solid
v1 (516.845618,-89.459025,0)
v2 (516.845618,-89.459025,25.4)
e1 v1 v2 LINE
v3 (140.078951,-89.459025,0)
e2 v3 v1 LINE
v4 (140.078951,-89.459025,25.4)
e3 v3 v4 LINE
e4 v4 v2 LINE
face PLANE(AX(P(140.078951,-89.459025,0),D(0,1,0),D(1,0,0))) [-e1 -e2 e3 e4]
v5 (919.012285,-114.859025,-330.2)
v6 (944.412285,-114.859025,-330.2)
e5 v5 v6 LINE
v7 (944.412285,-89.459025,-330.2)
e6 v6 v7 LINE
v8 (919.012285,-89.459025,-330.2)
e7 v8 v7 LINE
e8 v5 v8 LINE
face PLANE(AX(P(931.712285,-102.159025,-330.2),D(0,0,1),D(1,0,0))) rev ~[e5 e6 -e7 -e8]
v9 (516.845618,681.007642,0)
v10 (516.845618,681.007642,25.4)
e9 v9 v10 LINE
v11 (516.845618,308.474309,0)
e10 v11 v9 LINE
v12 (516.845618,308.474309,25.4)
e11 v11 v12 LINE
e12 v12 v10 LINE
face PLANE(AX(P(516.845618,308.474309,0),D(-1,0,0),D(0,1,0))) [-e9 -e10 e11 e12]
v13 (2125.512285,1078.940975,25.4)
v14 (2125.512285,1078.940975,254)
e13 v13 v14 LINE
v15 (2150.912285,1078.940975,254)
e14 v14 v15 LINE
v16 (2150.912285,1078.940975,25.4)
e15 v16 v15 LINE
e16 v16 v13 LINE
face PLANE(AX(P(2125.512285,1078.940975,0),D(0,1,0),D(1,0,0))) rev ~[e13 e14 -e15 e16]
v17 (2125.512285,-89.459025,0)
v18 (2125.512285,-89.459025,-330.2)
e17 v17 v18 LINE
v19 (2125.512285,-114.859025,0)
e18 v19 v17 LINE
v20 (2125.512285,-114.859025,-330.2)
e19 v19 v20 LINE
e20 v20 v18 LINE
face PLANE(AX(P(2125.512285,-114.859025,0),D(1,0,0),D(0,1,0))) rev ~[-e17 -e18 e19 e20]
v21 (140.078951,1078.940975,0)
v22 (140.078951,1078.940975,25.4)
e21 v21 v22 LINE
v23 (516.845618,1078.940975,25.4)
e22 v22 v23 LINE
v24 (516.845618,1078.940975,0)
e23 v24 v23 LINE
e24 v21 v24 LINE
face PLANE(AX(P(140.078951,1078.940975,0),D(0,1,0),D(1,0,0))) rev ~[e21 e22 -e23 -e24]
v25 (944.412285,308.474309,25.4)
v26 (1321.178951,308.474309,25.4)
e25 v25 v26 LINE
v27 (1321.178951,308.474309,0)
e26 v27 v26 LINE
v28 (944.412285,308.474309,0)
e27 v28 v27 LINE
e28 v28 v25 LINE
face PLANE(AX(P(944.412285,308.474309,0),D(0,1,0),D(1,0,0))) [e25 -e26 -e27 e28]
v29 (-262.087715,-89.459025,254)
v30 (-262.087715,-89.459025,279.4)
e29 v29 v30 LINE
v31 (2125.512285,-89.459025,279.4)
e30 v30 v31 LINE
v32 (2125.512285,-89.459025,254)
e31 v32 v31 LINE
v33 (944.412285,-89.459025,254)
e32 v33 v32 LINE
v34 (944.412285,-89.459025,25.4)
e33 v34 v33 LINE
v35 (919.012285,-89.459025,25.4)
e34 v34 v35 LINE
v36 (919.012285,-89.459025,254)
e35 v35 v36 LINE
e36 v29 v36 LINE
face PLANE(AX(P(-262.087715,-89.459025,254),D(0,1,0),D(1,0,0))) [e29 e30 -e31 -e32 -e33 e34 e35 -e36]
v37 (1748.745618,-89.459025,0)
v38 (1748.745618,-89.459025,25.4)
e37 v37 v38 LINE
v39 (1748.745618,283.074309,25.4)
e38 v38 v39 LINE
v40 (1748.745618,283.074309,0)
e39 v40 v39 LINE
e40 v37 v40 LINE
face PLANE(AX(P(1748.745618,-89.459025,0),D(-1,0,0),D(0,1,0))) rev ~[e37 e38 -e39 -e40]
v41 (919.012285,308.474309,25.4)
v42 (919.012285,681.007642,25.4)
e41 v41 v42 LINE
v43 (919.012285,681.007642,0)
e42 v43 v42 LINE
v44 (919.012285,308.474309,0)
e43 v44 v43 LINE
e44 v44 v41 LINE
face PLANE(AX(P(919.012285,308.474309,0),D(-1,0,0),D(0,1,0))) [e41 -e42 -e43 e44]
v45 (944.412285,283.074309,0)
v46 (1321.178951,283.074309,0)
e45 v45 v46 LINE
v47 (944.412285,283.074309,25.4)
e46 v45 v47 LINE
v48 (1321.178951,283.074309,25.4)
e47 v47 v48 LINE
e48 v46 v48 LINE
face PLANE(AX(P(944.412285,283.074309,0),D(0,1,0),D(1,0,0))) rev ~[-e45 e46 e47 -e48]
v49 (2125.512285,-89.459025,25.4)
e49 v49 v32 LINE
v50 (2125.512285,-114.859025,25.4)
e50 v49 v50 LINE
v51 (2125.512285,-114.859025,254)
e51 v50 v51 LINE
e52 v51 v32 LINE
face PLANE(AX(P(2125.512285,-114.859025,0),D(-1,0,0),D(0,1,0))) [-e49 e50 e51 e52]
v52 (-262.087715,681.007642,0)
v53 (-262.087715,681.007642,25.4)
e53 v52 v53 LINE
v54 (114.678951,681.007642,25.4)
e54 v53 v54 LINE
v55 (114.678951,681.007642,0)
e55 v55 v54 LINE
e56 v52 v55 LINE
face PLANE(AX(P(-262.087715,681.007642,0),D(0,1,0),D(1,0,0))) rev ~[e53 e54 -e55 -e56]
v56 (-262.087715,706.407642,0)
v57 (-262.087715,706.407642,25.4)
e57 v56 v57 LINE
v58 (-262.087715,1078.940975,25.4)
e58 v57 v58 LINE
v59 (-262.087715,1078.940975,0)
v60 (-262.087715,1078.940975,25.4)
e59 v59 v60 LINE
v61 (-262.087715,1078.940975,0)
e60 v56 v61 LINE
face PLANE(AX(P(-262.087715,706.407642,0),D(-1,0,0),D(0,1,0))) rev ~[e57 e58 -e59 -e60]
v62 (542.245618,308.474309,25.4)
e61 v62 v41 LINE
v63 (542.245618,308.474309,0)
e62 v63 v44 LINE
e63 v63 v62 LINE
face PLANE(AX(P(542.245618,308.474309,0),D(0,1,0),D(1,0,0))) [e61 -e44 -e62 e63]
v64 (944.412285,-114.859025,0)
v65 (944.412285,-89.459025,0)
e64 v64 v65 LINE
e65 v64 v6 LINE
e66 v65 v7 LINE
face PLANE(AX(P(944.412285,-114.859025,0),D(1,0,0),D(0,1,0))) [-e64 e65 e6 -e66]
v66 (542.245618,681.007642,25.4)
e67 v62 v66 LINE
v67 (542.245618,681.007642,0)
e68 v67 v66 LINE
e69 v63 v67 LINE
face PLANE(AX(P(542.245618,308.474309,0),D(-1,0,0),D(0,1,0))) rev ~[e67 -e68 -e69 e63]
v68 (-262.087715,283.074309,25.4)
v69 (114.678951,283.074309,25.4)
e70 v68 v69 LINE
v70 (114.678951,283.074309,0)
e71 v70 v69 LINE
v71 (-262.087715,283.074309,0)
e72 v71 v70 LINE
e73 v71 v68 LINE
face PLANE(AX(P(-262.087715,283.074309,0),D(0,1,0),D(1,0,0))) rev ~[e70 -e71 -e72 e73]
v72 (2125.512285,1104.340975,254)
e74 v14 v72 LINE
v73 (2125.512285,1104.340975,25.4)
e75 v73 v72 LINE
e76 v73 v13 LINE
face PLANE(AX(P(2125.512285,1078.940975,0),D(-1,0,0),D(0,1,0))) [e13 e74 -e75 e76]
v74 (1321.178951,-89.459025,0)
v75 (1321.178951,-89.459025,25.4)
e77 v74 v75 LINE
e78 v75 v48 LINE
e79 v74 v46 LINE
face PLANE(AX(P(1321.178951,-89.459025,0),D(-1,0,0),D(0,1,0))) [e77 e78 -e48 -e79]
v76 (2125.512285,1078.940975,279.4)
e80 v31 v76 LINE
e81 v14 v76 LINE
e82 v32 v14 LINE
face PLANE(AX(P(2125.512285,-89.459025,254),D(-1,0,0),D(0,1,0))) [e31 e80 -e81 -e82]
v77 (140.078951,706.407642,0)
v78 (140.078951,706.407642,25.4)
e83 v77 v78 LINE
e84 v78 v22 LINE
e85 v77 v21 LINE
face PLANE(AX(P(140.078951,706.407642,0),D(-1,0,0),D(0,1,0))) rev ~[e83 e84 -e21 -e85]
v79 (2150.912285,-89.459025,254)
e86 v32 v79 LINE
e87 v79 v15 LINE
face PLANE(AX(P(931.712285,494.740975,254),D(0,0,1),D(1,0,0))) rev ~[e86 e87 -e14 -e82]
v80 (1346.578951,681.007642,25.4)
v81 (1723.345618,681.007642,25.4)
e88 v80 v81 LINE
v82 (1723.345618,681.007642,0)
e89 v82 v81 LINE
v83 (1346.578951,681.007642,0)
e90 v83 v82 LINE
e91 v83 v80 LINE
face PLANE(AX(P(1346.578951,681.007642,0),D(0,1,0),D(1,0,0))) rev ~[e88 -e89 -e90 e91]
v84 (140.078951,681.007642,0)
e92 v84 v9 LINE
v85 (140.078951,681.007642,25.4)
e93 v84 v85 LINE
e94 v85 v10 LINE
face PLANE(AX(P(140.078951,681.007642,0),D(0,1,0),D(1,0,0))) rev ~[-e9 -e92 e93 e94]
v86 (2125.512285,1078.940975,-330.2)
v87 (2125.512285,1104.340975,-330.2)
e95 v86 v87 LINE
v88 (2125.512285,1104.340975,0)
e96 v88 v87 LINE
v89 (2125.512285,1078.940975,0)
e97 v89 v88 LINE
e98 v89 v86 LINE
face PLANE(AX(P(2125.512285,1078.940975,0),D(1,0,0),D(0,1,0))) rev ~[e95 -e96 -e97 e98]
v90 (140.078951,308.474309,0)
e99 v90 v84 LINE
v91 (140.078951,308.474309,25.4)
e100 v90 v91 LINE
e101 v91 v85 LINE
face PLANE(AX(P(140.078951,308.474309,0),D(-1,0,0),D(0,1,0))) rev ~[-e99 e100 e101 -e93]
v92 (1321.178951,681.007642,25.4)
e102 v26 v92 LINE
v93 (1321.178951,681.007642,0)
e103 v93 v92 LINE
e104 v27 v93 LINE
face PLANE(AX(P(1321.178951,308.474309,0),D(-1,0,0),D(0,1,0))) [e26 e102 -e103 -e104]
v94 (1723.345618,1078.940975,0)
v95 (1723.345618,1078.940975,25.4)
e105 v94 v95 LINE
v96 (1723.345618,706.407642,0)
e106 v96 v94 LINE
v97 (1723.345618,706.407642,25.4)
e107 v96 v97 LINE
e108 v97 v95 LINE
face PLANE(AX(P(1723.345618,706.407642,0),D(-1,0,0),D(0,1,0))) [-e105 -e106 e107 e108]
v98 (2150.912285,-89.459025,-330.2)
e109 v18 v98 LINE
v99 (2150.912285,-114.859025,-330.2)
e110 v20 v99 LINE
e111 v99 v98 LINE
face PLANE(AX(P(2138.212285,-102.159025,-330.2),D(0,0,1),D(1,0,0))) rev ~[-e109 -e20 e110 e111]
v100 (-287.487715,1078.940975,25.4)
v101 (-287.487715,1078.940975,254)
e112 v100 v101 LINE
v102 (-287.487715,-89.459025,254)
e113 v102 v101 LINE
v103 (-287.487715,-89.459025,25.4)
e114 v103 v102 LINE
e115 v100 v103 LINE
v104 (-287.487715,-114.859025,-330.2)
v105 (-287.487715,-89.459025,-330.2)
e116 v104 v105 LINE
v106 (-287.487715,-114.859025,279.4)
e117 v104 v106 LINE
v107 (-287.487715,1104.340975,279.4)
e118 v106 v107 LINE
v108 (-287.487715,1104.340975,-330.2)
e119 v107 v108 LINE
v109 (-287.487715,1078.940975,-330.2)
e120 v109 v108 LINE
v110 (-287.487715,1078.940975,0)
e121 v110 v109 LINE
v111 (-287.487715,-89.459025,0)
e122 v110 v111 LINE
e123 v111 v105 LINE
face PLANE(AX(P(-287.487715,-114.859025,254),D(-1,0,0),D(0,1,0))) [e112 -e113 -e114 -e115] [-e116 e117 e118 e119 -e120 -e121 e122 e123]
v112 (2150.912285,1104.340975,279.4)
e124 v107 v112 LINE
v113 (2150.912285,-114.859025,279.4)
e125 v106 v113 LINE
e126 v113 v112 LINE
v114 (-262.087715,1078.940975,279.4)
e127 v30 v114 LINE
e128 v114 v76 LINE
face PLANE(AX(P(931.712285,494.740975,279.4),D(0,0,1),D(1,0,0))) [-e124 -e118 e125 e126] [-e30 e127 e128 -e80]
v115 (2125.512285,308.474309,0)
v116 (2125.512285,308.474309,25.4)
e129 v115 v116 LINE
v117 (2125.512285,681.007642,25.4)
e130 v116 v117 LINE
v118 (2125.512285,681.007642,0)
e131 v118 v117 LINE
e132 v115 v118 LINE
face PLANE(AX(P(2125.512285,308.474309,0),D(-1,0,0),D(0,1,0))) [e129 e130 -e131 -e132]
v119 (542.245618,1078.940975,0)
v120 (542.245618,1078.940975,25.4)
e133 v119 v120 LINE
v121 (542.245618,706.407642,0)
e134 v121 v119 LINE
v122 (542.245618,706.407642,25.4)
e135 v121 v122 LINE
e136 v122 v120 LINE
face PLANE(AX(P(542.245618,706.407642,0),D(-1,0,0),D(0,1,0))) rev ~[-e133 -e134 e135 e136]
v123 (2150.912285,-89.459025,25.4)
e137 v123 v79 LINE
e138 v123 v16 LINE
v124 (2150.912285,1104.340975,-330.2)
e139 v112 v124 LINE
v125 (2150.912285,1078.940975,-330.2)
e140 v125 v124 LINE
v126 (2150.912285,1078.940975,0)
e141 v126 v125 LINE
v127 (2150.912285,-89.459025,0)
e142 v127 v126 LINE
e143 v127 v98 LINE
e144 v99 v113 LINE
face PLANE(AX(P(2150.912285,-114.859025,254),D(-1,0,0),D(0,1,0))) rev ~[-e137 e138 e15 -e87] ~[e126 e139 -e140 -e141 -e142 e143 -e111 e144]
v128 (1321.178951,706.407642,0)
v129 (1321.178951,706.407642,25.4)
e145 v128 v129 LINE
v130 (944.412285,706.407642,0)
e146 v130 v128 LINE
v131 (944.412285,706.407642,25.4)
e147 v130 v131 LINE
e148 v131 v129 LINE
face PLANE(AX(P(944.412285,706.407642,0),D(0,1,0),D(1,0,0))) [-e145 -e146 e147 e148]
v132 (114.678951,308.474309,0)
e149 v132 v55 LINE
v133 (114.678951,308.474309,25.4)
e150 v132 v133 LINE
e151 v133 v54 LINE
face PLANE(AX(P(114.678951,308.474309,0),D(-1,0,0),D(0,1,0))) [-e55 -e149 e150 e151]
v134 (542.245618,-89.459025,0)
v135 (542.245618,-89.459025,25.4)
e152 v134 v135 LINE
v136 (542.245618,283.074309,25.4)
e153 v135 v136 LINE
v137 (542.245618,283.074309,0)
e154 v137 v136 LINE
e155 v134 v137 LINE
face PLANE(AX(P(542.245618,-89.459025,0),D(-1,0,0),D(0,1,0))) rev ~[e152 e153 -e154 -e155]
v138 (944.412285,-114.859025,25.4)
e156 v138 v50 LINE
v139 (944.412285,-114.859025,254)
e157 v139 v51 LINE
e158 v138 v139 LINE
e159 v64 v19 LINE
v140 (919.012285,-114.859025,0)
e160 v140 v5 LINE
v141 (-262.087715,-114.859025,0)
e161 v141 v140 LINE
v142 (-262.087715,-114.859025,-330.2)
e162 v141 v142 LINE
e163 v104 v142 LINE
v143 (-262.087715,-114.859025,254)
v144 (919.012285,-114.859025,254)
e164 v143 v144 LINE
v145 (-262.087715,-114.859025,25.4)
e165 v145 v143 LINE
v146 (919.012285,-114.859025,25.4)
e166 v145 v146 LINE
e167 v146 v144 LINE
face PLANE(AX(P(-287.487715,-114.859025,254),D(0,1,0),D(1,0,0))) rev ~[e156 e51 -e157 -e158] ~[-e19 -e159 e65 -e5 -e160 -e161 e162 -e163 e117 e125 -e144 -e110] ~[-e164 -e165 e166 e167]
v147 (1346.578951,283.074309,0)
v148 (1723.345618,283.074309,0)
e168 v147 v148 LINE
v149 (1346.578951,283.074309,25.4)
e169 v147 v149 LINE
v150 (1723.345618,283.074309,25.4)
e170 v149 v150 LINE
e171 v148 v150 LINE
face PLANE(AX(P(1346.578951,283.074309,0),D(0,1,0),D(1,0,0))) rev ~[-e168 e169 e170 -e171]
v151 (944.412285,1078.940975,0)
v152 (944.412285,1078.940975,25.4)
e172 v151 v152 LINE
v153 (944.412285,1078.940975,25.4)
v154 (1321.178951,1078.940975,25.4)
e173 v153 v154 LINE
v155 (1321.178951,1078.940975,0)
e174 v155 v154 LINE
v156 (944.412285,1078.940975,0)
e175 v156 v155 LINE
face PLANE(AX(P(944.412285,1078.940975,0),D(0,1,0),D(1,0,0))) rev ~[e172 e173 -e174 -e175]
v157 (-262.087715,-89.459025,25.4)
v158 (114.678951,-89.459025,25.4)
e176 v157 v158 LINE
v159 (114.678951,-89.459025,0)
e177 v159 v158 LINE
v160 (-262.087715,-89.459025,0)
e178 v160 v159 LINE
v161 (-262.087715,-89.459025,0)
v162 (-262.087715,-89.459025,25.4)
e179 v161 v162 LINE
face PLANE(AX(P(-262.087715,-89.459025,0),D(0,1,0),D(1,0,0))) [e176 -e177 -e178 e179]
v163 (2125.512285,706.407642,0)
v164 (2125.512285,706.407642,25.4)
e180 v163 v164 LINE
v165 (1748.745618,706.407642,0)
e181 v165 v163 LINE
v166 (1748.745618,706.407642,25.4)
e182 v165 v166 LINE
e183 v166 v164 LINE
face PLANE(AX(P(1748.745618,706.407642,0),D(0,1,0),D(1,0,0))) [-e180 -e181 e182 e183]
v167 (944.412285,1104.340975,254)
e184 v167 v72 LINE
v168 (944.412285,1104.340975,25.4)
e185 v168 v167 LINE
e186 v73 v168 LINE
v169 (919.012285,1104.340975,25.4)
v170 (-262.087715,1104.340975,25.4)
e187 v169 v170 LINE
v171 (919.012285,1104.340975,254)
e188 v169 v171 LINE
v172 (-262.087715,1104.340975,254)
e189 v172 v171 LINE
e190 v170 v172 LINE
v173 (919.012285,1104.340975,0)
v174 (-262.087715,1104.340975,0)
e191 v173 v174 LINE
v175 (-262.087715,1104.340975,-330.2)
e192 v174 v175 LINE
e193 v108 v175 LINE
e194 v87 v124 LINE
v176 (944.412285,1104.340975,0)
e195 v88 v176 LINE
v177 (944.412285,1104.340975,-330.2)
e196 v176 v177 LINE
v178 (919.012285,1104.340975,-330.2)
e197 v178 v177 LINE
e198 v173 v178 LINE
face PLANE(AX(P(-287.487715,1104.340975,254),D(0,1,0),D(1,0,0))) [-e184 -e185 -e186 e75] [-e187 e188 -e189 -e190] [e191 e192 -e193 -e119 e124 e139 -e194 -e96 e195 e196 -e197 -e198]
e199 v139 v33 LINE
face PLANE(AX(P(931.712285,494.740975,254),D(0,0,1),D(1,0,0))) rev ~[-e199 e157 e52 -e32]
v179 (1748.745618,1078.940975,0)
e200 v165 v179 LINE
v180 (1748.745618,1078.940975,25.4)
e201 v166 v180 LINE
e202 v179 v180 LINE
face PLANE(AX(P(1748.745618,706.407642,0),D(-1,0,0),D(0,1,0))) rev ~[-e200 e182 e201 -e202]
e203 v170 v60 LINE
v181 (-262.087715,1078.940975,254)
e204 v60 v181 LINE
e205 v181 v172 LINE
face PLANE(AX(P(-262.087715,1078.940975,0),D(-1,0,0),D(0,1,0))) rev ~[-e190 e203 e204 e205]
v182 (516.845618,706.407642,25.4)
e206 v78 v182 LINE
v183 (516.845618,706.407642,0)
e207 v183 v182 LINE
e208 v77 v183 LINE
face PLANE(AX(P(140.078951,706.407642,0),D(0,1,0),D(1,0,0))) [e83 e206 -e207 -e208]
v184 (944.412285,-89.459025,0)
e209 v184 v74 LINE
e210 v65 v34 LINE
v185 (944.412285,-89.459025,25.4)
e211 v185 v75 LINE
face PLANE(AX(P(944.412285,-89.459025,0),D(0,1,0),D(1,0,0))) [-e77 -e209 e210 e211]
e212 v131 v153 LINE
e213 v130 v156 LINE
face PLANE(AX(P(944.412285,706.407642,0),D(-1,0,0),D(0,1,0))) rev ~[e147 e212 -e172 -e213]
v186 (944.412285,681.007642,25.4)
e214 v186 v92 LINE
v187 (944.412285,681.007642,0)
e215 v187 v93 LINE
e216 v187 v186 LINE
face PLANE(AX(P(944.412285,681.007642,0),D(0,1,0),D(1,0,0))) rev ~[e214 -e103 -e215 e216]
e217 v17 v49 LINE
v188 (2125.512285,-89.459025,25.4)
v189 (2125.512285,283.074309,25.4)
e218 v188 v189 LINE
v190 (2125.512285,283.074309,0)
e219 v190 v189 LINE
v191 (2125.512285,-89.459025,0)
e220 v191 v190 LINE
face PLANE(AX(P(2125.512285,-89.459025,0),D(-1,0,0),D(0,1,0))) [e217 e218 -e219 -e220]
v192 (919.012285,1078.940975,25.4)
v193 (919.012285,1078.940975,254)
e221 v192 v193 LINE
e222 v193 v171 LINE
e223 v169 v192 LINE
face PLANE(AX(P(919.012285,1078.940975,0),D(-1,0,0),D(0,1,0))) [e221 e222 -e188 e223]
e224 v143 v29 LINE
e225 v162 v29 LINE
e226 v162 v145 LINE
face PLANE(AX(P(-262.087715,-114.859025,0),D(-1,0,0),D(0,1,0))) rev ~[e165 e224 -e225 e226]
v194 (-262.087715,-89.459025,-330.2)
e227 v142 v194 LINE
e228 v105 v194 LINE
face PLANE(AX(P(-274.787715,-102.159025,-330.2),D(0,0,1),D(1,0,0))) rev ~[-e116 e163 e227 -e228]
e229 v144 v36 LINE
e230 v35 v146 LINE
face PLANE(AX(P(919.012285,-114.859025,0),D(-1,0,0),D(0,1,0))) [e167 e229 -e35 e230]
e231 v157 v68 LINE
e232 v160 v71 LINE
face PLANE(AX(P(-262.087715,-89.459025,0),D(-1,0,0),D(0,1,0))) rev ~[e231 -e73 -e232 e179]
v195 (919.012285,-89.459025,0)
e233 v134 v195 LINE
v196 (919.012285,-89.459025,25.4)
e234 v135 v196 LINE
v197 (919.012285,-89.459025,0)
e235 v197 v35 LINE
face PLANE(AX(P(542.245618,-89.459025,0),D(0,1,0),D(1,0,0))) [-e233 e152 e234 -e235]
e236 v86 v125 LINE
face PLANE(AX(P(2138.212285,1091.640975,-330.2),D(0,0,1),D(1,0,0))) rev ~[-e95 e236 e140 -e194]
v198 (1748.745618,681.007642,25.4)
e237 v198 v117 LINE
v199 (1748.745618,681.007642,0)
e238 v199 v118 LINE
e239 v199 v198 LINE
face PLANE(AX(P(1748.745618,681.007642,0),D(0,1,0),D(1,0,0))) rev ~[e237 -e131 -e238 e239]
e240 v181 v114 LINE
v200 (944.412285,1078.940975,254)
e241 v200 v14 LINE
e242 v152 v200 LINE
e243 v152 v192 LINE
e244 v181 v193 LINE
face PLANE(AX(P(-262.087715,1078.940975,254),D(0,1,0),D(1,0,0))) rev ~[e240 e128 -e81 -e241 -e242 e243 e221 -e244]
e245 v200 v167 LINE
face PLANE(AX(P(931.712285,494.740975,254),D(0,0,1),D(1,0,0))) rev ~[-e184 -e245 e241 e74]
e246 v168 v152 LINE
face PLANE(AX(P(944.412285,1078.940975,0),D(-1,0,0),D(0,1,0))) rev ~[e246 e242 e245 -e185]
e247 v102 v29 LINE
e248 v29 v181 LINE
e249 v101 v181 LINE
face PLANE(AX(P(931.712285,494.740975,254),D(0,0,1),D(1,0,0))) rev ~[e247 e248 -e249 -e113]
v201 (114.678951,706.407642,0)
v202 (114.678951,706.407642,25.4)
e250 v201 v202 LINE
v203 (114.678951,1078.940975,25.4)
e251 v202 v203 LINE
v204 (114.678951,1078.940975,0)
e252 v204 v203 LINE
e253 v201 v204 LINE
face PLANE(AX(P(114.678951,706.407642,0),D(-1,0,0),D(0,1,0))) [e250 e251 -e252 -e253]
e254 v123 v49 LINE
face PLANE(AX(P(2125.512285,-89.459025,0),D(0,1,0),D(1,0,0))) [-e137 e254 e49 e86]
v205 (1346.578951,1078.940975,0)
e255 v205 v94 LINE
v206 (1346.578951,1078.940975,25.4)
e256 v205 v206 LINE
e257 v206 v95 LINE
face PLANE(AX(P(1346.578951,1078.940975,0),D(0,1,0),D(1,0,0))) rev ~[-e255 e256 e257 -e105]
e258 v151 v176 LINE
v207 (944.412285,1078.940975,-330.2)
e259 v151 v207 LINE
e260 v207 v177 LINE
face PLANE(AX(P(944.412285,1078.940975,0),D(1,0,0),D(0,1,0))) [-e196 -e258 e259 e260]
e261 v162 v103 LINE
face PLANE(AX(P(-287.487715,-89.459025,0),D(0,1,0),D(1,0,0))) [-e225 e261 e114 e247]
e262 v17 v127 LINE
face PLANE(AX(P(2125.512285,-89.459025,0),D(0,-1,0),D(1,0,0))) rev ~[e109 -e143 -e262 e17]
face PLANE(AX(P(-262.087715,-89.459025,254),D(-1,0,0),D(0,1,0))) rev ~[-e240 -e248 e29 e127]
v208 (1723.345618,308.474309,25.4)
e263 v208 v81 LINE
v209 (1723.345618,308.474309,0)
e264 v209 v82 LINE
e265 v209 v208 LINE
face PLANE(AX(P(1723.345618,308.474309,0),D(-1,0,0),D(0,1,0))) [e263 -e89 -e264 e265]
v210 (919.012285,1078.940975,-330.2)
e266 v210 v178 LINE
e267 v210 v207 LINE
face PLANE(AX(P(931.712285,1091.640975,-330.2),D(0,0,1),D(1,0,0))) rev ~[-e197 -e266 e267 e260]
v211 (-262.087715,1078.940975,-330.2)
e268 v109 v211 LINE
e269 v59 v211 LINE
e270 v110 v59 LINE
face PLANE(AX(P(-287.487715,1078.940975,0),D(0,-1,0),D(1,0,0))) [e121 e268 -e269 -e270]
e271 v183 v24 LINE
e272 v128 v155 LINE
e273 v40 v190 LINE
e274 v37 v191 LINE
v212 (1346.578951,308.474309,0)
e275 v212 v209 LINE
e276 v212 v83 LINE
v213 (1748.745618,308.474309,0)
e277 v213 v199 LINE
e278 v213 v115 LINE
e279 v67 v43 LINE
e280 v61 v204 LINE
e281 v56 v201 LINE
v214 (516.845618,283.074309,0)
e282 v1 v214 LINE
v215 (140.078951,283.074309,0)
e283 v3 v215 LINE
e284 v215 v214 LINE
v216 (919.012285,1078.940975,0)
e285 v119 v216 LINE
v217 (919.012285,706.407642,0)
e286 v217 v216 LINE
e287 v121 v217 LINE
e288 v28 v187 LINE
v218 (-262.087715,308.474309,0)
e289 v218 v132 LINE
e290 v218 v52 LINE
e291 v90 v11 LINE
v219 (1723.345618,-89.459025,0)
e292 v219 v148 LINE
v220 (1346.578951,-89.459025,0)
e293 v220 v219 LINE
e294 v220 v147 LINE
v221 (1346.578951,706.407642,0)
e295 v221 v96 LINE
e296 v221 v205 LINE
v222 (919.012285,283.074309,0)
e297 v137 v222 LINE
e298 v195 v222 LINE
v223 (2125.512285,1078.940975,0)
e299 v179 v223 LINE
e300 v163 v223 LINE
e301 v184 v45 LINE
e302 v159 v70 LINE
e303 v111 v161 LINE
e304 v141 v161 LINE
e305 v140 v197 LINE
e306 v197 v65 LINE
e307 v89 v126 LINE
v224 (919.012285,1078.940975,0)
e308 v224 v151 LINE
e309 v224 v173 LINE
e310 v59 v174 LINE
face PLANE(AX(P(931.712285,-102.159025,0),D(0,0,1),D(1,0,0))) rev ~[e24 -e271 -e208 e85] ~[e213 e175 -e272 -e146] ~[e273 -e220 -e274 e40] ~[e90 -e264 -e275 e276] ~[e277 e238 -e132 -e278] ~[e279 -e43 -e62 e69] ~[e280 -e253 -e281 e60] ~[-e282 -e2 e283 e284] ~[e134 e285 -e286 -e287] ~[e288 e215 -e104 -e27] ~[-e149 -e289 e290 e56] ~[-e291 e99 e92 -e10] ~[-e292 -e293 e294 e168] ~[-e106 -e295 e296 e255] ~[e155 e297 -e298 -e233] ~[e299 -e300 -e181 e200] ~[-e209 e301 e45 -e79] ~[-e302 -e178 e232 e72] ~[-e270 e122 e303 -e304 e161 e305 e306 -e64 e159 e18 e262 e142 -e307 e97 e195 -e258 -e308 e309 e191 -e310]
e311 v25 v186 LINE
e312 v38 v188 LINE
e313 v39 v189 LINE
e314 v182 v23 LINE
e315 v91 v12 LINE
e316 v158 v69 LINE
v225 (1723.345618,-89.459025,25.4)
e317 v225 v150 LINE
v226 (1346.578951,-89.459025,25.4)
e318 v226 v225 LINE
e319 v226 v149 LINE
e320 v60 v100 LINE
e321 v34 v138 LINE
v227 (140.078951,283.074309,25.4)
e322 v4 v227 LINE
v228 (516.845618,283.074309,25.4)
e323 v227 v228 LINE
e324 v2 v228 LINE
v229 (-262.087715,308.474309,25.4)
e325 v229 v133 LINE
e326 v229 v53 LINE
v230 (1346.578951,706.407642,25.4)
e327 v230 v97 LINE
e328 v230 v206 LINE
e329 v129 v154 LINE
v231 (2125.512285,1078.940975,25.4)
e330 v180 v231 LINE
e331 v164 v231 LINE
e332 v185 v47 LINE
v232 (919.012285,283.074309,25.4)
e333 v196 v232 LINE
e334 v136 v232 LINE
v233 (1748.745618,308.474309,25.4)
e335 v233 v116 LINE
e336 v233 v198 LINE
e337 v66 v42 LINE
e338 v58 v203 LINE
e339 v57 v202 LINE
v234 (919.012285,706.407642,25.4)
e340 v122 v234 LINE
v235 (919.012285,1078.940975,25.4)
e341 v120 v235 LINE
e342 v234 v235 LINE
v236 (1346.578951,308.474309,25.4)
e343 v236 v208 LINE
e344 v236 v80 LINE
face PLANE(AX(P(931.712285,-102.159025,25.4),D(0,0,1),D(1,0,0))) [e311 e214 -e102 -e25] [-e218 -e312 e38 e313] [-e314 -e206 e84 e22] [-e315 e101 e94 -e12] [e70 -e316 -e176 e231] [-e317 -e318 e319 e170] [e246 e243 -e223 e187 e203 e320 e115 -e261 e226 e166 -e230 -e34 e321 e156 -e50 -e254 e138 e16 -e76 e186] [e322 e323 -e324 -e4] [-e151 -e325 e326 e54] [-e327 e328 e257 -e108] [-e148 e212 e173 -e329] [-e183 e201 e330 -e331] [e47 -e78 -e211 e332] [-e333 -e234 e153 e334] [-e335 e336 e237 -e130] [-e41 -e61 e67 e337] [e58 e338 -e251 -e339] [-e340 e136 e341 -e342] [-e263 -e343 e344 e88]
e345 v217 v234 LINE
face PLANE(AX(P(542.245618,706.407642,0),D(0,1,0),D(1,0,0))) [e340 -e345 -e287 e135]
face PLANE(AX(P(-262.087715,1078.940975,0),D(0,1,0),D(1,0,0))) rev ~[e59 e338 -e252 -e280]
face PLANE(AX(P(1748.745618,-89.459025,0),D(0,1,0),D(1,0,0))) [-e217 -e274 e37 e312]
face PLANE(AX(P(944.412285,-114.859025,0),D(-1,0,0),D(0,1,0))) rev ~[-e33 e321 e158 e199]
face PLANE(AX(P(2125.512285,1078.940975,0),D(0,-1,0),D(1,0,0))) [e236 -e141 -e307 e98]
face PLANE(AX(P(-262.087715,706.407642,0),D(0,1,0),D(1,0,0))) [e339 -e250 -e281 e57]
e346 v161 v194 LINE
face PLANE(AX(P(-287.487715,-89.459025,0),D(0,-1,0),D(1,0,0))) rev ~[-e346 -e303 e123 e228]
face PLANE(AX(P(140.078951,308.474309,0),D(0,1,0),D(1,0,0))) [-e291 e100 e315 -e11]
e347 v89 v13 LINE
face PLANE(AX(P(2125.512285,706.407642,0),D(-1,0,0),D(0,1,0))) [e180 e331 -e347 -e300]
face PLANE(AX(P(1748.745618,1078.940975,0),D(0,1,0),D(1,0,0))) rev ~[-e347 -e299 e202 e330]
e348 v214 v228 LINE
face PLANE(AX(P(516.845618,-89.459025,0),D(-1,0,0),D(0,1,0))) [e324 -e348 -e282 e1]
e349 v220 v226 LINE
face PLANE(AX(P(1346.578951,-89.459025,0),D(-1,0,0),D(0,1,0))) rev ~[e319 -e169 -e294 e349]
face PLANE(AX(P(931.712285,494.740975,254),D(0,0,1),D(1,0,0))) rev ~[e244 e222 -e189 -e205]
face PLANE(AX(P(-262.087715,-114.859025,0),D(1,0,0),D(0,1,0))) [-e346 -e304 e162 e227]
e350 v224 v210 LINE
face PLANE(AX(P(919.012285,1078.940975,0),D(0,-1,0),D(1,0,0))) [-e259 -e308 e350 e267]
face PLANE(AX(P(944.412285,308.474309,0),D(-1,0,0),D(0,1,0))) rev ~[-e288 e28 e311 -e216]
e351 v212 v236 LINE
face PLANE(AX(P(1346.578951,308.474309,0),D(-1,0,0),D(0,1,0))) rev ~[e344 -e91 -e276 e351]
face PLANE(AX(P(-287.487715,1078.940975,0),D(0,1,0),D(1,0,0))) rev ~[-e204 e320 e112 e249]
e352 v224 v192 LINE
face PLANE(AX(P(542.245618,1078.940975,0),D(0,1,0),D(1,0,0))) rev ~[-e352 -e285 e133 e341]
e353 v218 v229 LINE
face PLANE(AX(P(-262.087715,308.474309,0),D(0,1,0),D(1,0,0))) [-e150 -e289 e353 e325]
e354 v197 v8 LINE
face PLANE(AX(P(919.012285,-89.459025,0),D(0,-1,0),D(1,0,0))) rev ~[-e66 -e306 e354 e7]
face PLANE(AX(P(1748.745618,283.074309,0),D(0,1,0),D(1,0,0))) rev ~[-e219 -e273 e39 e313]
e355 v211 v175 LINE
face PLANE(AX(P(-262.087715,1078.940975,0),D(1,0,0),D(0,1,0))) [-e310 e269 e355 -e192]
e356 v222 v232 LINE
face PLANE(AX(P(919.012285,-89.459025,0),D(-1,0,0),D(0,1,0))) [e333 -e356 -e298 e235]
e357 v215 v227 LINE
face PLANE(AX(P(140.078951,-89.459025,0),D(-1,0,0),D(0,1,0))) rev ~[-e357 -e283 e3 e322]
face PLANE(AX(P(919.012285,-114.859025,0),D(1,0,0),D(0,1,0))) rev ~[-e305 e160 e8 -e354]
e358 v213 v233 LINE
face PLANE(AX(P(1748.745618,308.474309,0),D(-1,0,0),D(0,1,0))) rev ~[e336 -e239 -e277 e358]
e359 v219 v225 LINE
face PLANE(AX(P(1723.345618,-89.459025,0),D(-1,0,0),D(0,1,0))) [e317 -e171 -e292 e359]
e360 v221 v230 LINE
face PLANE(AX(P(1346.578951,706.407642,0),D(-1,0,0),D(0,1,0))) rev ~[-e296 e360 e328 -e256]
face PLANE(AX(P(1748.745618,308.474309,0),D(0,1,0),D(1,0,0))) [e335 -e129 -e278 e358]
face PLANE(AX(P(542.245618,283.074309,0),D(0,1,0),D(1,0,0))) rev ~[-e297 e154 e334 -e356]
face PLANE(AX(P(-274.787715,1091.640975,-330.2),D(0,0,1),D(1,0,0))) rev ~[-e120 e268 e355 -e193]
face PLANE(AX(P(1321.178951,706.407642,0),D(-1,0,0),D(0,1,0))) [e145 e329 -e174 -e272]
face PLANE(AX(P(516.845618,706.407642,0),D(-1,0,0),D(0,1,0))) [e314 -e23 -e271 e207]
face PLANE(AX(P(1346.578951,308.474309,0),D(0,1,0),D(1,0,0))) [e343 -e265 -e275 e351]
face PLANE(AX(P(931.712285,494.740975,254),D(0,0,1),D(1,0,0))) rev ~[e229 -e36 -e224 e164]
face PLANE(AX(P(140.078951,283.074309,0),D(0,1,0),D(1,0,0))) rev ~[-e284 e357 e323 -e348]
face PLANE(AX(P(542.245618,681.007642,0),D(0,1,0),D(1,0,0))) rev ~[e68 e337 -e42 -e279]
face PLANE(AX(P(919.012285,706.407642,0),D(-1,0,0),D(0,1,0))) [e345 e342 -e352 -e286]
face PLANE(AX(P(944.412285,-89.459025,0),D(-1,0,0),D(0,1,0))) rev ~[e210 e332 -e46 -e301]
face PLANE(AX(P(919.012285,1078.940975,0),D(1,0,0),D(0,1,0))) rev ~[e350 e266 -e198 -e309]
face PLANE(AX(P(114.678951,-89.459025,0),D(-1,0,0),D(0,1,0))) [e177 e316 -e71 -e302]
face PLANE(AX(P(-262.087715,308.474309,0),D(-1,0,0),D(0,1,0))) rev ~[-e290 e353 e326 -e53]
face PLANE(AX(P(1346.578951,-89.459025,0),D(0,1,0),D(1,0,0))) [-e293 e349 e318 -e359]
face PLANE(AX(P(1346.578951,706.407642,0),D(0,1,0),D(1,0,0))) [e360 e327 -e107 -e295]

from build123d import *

# Parameters (mm, degrees)
F0_W     = 25.4
F0_H     = 25.4
F0_W_2   = 376.7666666667
F0_H_2   = 372.5333333333
F1_DEPTH = 25.4
F2_DEPTH = 330.2
F3_DEPTH = 254
F4_W     = 2438.4
F4_H     = 1219.2
F4_W_2   = 2387.6
F4_H_2   = 1168.4
F5_DEPTH = 25.4


with BuildPart() as f1:
    # F0 (on Top) → F1 (new body)
    with BuildSketch(Plane.XY):
        with Locations((931.7122847671, -102.1590246889)):
            Rectangle(F0_W, F0_H)
        Polygon((919.0122847671, 1104.3409753111), (-262.0877152329, 1104.3409753111), (-262.0877152329, 1078.9409753111), (-287.4877152329, 1078.9409753111), (-287.4877152329, -89.4590246889), (-262.0877152329, -89.4590246889), (-262.0877152329, -114.8590246889), (919.0122847671, -114.8590246889), (919.0122847671, -89.4590246889), (944.4122847671, -89.4590246889), (944.4122847671, -114.8590246889), (2125.5122847671, -114.8590246889), (2125.5122847671, -89.4590246889), (2150.9122847671, -89.4590246889), (2150.9122847671, 1078.9409753111), (2125.5122847671, 1078.9409753111), (2125.5122847671, 1104.3409753111), (944.4122847671, 1104.3409753111), (944.4122847671, 1078.9409753111), (919.0122847671, 1078.9409753111), align=None)
        with Locations((-73.7043818996, 96.8076419778)):
            Rectangle(F0_W_2, F0_H_2, mode=Mode.SUBTRACT)
        with Locations((328.4622847671, 96.8076419778)):
            Rectangle(F0_W_2, F0_H_2, mode=Mode.SUBTRACT)
        with Locations((730.6289514337, 96.8076419778)):
            Rectangle(F0_W_2, F0_H_2, mode=Mode.SUBTRACT)
        with Locations((-73.7043818996, 494.7409753111)):
            Rectangle(F0_W_2, F0_H_2, mode=Mode.SUBTRACT)
        with Locations((1132.7956181004, 96.8076419778)):
            Rectangle(F0_W_2, F0_H_2, mode=Mode.SUBTRACT)
        with Locations((1534.9622847671, 96.8076419778)):
            Rectangle(F0_W_2, F0_H_2, mode=Mode.SUBTRACT)
        with Locations((1937.1289514337, 96.8076419778)):
            Rectangle(F0_W_2, F0_H_2, mode=Mode.SUBTRACT)
        with Locations((1534.9622847671, 494.7409753111)):
            Rectangle(F0_W_2, F0_H_2, mode=Mode.SUBTRACT)
        with Locations((1937.1289514337, 494.7409753111)):
            Rectangle(F0_W_2, F0_H_2, mode=Mode.SUBTRACT)
        with Locations((328.4622847671, 494.7409753111)):
            Rectangle(F0_W_2, F0_H_2, mode=Mode.SUBTRACT)
        with Locations((730.6289514337, 494.7409753111)):
            Rectangle(F0_W_2, F0_H_2, mode=Mode.SUBTRACT)
        with Locations((-73.7043818996, 892.6743086444)):
            Rectangle(F0_W_2, F0_H_2, mode=Mode.SUBTRACT)
        with Locations((328.4622847671, 892.6743086444)):
            Rectangle(F0_W_2, F0_H_2, mode=Mode.SUBTRACT)
        with Locations((730.6289514337, 892.6743086444)):
            Rectangle(F0_W_2, F0_H_2, mode=Mode.SUBTRACT)
        with Locations((1132.7956181004, 494.7409753111)):
            Rectangle(F0_W_2, F0_H_2, mode=Mode.SUBTRACT)
        with Locations((1132.7956181004, 892.6743086444)):
            Rectangle(F0_W_2, F0_H_2, mode=Mode.SUBTRACT)
        with Locations((1534.9622847671, 892.6743086444)):
            Rectangle(F0_W_2, F0_H_2, mode=Mode.SUBTRACT)
        with Locations((1937.1289514337, 892.6743086444)):
            Rectangle(F0_W_2, F0_H_2, mode=Mode.SUBTRACT)
        with Locations((-274.7877152329, -102.1590246889)):
            Rectangle(F0_W, F0_H)
        with Locations((931.7122847671, 1091.6409753111)):
            Rectangle(F0_W, F0_H)
        with Locations((-274.7877152329, 1091.6409753111)):
            Rectangle(F0_W, F0_H)
        with Locations((2138.2122847671, -102.1590246889)):
            Rectangle(F0_W, F0_H)
        with Locations((2138.2122847671, 1091.6409753111)):
            Rectangle(F0_W, F0_H)
    extrude(amount=F1_DEPTH)

    # F0 (on Top) → F2 (join)
    with BuildSketch(Plane.XY):
        with Locations((-274.7877152329, 1091.6409753111)):
            Rectangle(F0_W, F0_H)
        with Locations((-274.7877152329, -102.1590246889)):
            Rectangle(F0_W, F0_H)
        with Locations((931.7122847671, -102.1590246889)):
            Rectangle(F0_W, F0_H)
        with Locations((2138.2122847671, -102.1590246889)):
            Rectangle(F0_W, F0_H)
        with Locations((2138.2122847671, 1091.6409753111)):
            Rectangle(F0_W, F0_H)
        with Locations((931.7122847671, 1091.6409753111)):
            Rectangle(F0_W, F0_H)
    extrude(amount=-F2_DEPTH)

    # F0 (on Top) → F3 (join)
    with BuildSketch(Plane.XY):
        with Locations((-274.7877152329, 1091.6409753111)):
            Rectangle(F0_W, F0_H)
        with Locations((931.7122847671, 1091.6409753111)):
            Rectangle(F0_W, F0_H)
        with Locations((-274.7877152329, -102.1590246889)):
            Rectangle(F0_W, F0_H)
        with Locations((931.7122847671, -102.1590246889)):
            Rectangle(F0_W, F0_H)
        with Locations((2138.2122847671, -102.1590246889)):
            Rectangle(F0_W, F0_H)
        with Locations((2138.2122847671, 1091.6409753111)):
            Rectangle(F0_W, F0_H)
    extrude(amount=F3_DEPTH)

    # F4 (on face) → F5 (join)
    with BuildSketch(Plane.XY.offset(254)):
        with Locations((931.7122847671, 494.7409753111)):
            Rectangle(F4_W, F4_H)
        with Locations((931.7122847671, 494.7409753111)):
            Rectangle(F4_W_2, F4_H_2, mode=Mode.SUBTRACT)
    extrude(amount=F5_DEPTH)


solid = f1.part
